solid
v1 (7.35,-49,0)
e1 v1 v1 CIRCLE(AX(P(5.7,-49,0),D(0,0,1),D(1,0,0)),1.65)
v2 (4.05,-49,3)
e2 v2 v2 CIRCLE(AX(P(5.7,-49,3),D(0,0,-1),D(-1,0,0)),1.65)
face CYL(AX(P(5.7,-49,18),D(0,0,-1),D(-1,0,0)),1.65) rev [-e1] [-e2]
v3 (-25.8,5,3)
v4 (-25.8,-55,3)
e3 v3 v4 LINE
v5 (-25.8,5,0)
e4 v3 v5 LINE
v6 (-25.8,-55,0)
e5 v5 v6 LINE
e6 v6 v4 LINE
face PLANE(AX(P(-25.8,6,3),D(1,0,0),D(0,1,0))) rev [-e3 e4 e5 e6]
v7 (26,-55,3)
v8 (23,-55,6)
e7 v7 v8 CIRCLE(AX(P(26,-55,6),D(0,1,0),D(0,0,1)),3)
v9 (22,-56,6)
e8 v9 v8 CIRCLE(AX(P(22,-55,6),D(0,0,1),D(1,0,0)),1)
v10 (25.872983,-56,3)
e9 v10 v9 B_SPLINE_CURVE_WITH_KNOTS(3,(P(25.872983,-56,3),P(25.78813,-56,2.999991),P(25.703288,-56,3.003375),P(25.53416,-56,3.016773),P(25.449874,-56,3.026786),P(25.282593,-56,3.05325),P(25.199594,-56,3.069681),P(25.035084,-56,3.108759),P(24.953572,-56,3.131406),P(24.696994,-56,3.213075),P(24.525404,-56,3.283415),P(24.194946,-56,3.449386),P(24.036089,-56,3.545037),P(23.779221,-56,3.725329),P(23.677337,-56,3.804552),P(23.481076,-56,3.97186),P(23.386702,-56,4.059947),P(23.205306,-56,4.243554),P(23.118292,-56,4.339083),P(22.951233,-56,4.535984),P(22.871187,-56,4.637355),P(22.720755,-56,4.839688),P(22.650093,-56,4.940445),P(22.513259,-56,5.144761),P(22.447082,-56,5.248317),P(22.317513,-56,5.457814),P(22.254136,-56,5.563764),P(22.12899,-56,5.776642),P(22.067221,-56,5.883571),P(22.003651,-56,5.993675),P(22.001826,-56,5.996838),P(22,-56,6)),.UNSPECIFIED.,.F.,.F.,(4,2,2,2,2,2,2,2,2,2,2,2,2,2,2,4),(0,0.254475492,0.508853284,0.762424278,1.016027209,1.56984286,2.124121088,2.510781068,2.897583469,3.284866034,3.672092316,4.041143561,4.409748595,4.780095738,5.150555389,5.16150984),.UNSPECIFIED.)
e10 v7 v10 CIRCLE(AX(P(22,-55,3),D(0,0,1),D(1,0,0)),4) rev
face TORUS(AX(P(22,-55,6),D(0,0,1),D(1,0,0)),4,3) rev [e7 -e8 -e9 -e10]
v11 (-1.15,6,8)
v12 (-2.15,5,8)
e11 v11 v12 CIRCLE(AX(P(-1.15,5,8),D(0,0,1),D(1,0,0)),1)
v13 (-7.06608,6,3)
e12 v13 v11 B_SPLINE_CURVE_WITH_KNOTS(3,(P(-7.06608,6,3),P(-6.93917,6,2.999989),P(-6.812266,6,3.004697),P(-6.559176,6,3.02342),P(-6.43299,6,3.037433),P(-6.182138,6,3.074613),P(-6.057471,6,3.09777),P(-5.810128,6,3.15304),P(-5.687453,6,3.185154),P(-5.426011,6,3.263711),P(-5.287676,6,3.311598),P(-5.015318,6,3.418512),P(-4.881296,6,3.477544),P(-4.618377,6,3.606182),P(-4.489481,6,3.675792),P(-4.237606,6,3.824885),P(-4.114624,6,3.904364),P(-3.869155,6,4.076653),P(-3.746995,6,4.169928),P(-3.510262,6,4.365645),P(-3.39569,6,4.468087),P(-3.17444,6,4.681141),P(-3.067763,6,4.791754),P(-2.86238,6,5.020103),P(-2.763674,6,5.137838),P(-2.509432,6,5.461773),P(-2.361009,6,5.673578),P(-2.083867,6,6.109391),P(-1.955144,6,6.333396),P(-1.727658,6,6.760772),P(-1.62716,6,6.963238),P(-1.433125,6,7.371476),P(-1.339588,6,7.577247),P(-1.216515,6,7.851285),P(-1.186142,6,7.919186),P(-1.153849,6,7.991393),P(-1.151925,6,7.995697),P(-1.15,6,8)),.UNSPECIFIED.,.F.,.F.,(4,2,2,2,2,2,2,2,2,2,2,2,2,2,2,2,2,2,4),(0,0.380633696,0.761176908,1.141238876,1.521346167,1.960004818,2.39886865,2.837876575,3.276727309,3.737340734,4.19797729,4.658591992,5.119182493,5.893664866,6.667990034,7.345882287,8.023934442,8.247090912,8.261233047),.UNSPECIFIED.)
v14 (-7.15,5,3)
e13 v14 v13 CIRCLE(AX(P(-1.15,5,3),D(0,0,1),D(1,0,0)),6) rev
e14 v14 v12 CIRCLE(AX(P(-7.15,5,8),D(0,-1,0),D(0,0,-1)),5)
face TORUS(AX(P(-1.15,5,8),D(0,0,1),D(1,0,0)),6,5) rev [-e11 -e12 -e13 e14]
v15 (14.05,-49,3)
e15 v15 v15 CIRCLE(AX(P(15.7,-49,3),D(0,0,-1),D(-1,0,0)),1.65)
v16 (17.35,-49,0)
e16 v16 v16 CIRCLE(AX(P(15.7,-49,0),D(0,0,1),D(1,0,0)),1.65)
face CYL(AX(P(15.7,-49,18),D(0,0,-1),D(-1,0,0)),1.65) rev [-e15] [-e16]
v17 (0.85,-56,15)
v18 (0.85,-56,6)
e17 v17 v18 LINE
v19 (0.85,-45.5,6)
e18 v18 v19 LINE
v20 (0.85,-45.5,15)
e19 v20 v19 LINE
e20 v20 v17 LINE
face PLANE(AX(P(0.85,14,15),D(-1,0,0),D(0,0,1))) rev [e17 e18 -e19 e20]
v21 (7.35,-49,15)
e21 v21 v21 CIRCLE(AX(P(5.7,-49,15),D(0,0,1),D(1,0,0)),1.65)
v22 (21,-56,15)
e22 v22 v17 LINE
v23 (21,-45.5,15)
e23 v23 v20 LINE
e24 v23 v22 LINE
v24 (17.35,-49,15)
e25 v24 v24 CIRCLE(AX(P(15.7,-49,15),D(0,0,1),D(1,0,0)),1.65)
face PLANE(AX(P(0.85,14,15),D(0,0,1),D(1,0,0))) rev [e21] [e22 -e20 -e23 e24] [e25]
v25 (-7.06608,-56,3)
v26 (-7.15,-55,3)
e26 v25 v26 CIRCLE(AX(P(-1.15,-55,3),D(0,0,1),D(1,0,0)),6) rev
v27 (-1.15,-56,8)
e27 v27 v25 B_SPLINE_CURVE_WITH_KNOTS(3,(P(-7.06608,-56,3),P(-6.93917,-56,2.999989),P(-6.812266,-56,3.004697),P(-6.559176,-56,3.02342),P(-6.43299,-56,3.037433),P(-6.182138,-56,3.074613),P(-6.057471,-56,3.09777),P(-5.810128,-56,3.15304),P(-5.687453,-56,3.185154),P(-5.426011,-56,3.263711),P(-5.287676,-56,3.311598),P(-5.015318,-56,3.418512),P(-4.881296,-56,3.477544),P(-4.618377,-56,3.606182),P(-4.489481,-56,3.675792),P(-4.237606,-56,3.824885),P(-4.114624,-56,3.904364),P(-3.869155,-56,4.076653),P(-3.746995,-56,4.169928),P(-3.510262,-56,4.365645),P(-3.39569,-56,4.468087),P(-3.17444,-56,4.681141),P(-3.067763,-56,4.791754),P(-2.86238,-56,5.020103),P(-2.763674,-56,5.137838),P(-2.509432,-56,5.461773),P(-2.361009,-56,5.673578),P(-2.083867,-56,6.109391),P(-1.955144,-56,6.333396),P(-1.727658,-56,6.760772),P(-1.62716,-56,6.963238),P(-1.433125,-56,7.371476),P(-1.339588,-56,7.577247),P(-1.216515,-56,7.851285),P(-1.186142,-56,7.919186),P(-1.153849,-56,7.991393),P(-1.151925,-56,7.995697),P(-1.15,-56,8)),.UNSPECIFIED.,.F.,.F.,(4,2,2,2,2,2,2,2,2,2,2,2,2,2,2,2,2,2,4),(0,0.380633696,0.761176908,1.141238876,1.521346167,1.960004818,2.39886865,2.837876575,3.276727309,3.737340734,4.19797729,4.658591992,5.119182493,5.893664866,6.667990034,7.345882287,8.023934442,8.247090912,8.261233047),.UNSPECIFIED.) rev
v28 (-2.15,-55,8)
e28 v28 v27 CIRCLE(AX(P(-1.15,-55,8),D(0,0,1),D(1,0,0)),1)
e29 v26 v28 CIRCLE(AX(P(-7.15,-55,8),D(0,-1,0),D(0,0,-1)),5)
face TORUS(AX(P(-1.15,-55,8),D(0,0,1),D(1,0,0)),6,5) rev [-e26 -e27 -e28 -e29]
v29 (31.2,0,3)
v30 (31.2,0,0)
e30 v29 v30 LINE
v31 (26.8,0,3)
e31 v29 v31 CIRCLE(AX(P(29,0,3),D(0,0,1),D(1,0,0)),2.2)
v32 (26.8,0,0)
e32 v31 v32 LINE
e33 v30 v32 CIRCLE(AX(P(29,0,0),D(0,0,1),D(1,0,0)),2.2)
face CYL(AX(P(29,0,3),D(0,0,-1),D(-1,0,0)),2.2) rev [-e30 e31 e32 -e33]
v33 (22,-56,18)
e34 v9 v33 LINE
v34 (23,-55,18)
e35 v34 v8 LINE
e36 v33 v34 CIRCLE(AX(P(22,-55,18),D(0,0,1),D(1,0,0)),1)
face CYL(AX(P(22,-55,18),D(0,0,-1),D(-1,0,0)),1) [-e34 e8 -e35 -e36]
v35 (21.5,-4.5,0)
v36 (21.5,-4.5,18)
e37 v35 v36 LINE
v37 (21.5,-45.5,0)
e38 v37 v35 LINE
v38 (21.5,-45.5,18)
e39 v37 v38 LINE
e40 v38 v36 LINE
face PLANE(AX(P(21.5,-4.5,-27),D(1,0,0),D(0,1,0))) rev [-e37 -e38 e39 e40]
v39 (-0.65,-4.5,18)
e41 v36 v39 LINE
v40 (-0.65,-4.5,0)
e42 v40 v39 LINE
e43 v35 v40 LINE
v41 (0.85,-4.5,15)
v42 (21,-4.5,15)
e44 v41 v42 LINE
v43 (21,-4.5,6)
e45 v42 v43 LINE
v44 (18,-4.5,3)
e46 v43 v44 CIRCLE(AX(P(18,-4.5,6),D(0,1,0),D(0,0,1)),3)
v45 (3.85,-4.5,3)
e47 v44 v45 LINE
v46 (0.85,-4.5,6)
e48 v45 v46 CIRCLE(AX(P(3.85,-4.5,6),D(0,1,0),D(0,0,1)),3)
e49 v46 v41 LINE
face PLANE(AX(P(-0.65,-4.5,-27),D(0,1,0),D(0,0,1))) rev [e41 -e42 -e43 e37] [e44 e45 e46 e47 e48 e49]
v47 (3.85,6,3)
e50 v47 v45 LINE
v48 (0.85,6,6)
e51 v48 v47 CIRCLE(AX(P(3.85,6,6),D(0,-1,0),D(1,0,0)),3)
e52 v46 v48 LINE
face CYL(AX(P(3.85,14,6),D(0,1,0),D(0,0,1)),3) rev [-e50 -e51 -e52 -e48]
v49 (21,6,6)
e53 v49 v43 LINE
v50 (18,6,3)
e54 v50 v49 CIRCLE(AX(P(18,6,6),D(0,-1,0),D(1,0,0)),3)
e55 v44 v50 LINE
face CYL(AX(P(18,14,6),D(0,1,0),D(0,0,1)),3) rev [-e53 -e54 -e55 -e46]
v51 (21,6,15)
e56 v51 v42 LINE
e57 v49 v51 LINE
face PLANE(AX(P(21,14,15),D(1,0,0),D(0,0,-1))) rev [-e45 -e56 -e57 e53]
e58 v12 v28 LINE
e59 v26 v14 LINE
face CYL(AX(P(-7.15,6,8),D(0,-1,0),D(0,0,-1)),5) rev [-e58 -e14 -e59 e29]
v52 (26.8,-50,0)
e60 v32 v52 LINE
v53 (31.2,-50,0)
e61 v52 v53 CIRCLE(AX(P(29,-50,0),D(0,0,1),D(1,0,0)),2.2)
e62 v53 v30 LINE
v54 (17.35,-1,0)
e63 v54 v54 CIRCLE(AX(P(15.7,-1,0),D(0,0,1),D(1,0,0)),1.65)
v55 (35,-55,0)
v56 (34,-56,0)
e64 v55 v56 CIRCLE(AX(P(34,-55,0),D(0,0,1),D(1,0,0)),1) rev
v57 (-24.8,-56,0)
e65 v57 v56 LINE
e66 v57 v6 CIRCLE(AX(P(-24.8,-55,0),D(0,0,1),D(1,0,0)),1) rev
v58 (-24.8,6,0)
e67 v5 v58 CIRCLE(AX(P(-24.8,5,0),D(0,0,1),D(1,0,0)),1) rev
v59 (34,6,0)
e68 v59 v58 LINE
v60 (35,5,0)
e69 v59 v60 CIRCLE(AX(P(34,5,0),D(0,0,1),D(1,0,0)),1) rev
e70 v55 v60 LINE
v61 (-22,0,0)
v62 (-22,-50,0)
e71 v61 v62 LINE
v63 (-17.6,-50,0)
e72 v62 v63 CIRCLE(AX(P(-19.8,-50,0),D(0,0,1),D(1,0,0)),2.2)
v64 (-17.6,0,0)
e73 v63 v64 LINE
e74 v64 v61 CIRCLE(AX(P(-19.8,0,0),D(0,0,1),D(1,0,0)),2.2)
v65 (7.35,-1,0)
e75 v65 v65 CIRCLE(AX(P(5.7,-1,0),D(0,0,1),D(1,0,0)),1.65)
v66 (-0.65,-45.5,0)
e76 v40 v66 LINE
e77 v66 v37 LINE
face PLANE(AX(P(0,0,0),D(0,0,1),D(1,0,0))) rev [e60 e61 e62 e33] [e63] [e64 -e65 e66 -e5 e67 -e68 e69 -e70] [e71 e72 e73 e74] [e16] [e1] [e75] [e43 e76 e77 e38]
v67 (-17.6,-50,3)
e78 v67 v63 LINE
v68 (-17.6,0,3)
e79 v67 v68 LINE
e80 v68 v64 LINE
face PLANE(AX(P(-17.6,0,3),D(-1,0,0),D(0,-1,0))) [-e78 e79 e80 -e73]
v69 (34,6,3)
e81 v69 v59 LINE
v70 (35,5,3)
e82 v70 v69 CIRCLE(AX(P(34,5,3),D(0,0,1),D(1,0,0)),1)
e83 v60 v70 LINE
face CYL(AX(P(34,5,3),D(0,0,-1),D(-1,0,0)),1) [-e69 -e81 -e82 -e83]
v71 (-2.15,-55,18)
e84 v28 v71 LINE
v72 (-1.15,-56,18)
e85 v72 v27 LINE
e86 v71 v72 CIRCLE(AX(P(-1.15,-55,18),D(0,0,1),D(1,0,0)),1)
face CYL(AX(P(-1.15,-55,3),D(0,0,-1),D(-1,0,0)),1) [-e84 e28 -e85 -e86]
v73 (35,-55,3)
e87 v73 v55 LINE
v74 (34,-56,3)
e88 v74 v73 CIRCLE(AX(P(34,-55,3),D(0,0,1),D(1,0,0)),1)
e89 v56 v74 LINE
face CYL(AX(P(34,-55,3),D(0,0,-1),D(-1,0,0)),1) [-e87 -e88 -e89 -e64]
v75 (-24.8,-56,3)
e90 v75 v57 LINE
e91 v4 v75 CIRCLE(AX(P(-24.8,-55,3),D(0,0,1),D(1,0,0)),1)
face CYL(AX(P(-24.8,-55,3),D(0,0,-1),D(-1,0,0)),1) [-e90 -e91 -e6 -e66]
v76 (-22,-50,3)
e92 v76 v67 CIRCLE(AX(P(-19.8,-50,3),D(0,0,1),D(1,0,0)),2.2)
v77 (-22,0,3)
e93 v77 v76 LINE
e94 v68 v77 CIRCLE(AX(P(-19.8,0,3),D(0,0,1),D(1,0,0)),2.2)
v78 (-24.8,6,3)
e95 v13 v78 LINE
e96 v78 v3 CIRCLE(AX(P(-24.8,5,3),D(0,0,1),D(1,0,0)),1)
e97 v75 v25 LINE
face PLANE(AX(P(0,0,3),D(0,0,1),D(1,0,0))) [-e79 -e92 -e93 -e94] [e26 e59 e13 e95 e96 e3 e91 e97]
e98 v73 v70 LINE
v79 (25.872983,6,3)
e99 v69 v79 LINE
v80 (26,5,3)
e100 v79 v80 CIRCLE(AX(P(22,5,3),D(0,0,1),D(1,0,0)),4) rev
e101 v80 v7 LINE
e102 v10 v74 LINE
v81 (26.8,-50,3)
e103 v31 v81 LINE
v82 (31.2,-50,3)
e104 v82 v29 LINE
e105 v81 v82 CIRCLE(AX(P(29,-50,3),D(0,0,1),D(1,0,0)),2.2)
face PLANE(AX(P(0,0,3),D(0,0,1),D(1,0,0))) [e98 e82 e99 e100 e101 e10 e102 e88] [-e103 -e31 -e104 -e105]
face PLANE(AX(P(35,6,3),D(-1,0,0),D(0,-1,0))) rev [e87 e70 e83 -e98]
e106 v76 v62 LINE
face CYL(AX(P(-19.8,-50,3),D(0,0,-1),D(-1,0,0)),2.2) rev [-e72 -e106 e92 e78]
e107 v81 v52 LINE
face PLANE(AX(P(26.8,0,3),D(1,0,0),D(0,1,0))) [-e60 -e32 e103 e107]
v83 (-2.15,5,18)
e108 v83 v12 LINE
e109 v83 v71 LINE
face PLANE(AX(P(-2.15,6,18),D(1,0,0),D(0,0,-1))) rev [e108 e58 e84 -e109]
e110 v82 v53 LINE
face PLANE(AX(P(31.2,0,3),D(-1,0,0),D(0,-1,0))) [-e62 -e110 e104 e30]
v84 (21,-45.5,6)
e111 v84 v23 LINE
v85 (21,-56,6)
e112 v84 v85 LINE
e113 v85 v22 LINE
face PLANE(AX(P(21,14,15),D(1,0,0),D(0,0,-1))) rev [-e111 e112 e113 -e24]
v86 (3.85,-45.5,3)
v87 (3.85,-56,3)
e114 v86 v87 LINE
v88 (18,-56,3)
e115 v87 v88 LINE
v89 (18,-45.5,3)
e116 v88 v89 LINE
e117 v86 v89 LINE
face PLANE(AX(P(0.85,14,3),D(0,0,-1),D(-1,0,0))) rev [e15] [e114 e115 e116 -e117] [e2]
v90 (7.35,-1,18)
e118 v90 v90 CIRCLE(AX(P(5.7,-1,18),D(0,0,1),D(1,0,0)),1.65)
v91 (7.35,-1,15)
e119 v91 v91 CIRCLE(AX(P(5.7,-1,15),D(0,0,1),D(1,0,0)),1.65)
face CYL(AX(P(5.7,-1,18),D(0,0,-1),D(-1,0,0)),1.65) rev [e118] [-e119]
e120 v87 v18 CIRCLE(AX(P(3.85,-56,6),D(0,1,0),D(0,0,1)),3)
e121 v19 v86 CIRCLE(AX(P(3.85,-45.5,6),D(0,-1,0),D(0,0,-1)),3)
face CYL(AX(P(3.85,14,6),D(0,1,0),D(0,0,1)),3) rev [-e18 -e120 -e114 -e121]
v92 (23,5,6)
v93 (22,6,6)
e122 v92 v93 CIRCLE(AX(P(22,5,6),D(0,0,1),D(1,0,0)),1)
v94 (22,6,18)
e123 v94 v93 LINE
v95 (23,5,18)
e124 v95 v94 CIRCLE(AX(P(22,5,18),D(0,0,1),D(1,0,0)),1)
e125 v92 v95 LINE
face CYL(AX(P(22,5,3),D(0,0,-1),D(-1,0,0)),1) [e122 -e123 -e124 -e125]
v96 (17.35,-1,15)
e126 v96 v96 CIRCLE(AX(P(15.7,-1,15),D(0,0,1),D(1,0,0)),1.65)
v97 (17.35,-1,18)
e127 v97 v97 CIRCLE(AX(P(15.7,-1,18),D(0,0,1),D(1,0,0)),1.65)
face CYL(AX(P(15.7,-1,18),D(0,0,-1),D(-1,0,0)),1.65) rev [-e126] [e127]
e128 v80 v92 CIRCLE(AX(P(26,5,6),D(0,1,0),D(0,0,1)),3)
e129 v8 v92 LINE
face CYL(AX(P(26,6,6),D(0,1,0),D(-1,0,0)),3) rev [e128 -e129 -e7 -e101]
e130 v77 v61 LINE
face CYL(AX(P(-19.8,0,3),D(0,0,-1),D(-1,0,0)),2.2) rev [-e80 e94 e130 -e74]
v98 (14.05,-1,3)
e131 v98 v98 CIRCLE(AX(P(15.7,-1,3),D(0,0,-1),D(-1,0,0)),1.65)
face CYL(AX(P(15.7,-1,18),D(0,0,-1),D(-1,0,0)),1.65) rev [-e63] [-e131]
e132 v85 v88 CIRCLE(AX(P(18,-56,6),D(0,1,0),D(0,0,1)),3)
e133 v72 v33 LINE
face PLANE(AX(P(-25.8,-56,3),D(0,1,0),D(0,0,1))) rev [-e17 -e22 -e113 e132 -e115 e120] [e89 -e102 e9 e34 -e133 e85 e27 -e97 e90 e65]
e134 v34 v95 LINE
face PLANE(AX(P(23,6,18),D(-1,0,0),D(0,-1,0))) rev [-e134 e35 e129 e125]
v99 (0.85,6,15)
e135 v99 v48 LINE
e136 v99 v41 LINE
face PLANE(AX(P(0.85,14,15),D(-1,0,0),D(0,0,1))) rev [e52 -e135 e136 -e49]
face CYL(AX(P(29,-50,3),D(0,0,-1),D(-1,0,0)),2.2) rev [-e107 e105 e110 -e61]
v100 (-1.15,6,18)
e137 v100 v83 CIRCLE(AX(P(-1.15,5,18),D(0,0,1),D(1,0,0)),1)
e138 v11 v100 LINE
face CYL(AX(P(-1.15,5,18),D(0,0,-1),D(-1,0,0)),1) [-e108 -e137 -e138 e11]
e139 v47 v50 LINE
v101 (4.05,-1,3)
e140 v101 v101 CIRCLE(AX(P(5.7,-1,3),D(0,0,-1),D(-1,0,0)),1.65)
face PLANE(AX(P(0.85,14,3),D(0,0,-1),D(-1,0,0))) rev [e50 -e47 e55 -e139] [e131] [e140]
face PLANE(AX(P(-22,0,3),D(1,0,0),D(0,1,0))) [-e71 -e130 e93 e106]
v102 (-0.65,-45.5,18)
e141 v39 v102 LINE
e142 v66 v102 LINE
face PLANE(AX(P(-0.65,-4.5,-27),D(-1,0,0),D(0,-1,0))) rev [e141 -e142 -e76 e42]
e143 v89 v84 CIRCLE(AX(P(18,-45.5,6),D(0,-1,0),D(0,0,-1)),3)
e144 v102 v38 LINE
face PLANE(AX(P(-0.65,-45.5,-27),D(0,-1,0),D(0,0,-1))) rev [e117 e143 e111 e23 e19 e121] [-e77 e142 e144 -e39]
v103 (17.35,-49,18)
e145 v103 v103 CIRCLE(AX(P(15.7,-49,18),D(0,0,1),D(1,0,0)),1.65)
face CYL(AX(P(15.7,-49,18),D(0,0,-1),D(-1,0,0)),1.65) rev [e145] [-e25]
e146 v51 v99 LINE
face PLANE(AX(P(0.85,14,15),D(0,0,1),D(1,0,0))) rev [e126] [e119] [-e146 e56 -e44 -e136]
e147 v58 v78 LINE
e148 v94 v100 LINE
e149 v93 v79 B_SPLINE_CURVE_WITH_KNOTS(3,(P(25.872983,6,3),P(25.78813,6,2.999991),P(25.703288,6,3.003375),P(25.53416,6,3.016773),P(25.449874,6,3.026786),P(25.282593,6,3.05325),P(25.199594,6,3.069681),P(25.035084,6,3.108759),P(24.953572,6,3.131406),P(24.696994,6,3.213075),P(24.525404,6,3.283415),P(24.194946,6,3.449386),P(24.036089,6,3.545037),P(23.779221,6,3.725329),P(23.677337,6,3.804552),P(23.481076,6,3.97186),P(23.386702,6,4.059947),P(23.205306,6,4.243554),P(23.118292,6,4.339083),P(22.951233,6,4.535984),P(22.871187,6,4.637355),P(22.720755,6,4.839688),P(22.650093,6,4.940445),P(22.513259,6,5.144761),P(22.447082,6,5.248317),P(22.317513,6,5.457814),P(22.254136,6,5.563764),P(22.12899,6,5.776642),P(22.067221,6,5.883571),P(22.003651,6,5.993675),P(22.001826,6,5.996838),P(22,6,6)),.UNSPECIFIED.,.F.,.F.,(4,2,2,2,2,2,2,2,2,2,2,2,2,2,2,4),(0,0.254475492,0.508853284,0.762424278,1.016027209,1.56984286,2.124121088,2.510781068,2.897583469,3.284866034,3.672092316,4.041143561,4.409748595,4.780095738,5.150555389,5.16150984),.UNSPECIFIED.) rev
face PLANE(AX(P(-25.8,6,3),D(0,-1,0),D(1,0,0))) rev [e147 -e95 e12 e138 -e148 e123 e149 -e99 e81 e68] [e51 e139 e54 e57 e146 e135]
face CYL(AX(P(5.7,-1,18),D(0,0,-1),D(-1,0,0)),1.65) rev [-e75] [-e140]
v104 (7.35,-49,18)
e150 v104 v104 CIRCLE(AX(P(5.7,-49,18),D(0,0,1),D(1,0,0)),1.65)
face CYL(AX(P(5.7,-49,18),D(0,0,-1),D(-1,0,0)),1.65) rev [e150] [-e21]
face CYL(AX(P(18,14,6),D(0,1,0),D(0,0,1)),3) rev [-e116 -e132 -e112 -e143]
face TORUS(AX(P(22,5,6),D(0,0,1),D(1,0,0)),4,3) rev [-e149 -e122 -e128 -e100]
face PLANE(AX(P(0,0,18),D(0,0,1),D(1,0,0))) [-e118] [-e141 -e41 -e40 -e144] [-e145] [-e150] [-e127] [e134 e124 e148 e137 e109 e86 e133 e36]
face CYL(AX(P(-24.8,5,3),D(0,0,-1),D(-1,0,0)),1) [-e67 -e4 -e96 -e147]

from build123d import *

# Parameters (mm, degrees)
SKETCH_1_W          = 60.8
SKETCH_1_H          = 62
EXTRUDE_1_DEPTH     = 3
SKETCH_2_W          = 25.15
SKETCH_2_H          = 62
SKETCH_2_R          = 1.65
EXTRUDE_2_DEPTH     = 15
CUT_EXTRUDE_START   = -45
SKETCH_4_R          = 1.65
SKETCH_4_W          = 22.15
SKETCH_4_H          = 41
CUT_EXTRUDE_4_DEPTH = 45
FILLET_1_R          = 1
FILLET_2_R          = 5
SKETCH_5_W          = 20.15
SKETCH_5_H          = 12
CUT_EXTRUDE_5_DEPTH = 70
FILLET_3_R          = 3
FILLET_4_R          = 3


with BuildPart() as part:
    # 草图1 → 凸台-拉伸1 (new body)
    with BuildSketch(Plane.XY):
        with Locations((4.6, -25)):
            Rectangle(SKETCH_1_W, SKETCH_1_H)
        with BuildLine():
            Line((26.8, 0), (26.8, -50))
            ThreePointArc((26.8, -50), (29, -52.2), (31.2, -50))
            Line((31.2, -50), (31.2, 0))
            ThreePointArc((31.2, 0), (29, 2.2), (26.8, 0))
        make_face(mode=Mode.SUBTRACT)
        with BuildLine():
            Line((-22, 0), (-22, -50))
            ThreePointArc((-22, -50), (-19.8, -52.2), (-17.6, -50))
            Line((-17.6, -50), (-17.6, 0))
            ThreePointArc((-17.6, 0), (-19.8, 2.2), (-22, 0))
        make_face(mode=Mode.SUBTRACT)
    extrude(amount=EXTRUDE_1_DEPTH)

    # 草图2 → 凸台-拉伸2 (add)
    with BuildSketch(Plane.XY.offset(3)):
        with Locations((10.425, -25)):
            Rectangle(SKETCH_2_W, SKETCH_2_H)
        with Locations((5.7, -1)):
            Circle(SKETCH_2_R, mode=Mode.SUBTRACT)
        with Locations((15.7, -1)):
            Circle(SKETCH_2_R, mode=Mode.SUBTRACT)
        with Locations((15.7, -49)):
            Circle(SKETCH_2_R, mode=Mode.SUBTRACT)
        with Locations((5.7, -49)):
            Circle(SKETCH_2_R, mode=Mode.SUBTRACT)
    extrude(amount=EXTRUDE_2_DEPTH)

    # 草图4 → 切除-拉伸4 (cut)
    with BuildSketch(Plane.XY.offset(18).offset(CUT_EXTRUDE_START)):
        with Locations((5.7, -1)):
            Circle(SKETCH_4_R)
        with Locations((5.7, -49)):
            Circle(SKETCH_4_R)
        with Locations((15.7, -49)):
            Circle(SKETCH_4_R)
        with Locations((15.7, -1)):
            Circle(SKETCH_4_R)
        with Locations((10.425, -25)):
            Rectangle(SKETCH_4_W, SKETCH_4_H)
    extrude(amount=CUT_EXTRUDE_4_DEPTH, mode=Mode.SUBTRACT)

    # 圆角1
    fillet_1_edges = [part.edges().sort_by_distance(p)[0] for p in [
        (-2.15, 6, 10.5),
        (-2.15, -56, 10.5),
        (23, -56, 10.5),
        (23, 6, 10.5),
        (-25.8, 6, 1.5),
        (35, 6, 1.5),
        (35, -56, 1.5),
        (-25.8, -56, 1.5),
    ]]
    fillet(fillet_1_edges, radius=FILLET_1_R)

    # 圆角2
    # the kernel refuses this fillet: 5 mm, written as the material it adds along each edge
    with BuildSketch(Plane(origin=(-2.15, -55, 3), x_dir=(0, 0, 1), z_dir=(0, 1, 0))) as fillet_2_piece_1:
        with BuildLine():
            CenterArc((FILLET_2_R, -FILLET_2_R), FILLET_2_R, 90, 90)
            Line((0, -FILLET_2_R), (0, 0))
            Line((0, 0), (FILLET_2_R, 0))
        make_face()
    extrude(amount=60)
    with BuildSketch(Plane(origin=(-1.15, 5, 3), x_dir=(-0.9999802608561372, -0.00628314396555929, 0), z_dir=(-0.00628314396555929, 0.9999802608561372, 0))) as fillet_2_piece_2_section:
        with BuildLine():
            CenterArc((-1 - FILLET_2_R, FILLET_2_R), FILLET_2_R, 270, 90)
            Line((-1 - FILLET_2_R, 0), (-1, 0))
            Line((-1, 0), (-1, FILLET_2_R))
        make_face()
    fillet_2_piece_2 = revolve(axis=Axis((-1.15, 5, 3), (0, 0, 1)), revolution_arc=359.64, mode=Mode.PRIVATE)
    fillet_2_piece_2 = split(fillet_2_piece_2, bisect_by=Plane(origin=(-1.917475006, 6, 5.017645517), z_dir=(0, -1, 0)), keep=Keep.TOP, mode=Mode.PRIVATE)
    add(fillet_2_piece_2)
    with BuildSketch(Plane(origin=(-1.15, -55, 3), x_dir=(-0.9999802608561372, 0.006283143965561067, 0), z_dir=(-0.006283143965561067, -0.9999802608561372, 0))) as fillet_2_piece_3_section:
        with BuildLine():
            CenterArc((-1 - FILLET_2_R, -FILLET_2_R), FILLET_2_R, 0, 90)
            Line((-1 - FILLET_2_R, 0), (-1, 0))
            Line((-1, 0), (-1, -FILLET_2_R))
        make_face()
    fillet_2_piece_3 = revolve(axis=Axis((-1.15, -55, 3), (0, 0, -1)), revolution_arc=359.64, mode=Mode.PRIVATE)
    fillet_2_piece_3 = split(fillet_2_piece_3, bisect_by=Plane(origin=(-1.917475041, -56, 5.017645533), z_dir=(0, 1, 0)), keep=Keep.TOP, mode=Mode.PRIVATE)
    add(fillet_2_piece_3)

    # 草图5 → 切除-拉伸5 (cut)
    with BuildSketch(Plane(origin=(0, -56, 0), x_dir=(-1, 0, 0), z_dir=(0, -1, 0))):
        with Locations((-10.925, -9)):
            Rectangle(SKETCH_5_W, SKETCH_5_H)
    extrude(amount=-CUT_EXTRUDE_5_DEPTH, mode=Mode.SUBTRACT)

    # 圆角3
    fillet_3_edges = [part.edges().sort_by_distance(p)[0] for p in [
        (0.85, 0.75, 3),
        (0.85, -50.75, 3),
        (21, 0.75, 3),
        (21, -50.75, 3),
    ]]
    fillet(fillet_3_edges, radius=FILLET_3_R)

    # 圆角4
    # the kernel refuses this fillet: 3 mm, written as the material it adds along each edge
    with BuildSketch(Plane(origin=(23, 5, 3), x_dir=(1, 0, 0), z_dir=(0, -1, 0))) as fillet_4_piece_1:
        with BuildLine():
            CenterArc((FILLET_4_R, FILLET_4_R), FILLET_4_R, 180, 90)
            Line((0, FILLET_4_R), (0, 0))
            Line((0, 0), (FILLET_4_R, 0))
        make_face()
    extrude(amount=60)
    with BuildSketch(Plane(origin=(22, 5, 3), x_dir=(0.9999802608561372, -0.0062831439655584, 0), z_dir=(0.0062831439655584, 0.9999802608561372, 0))) as fillet_4_piece_2_section:
        with BuildLine():
            CenterArc((-1 - FILLET_4_R, -FILLET_4_R), FILLET_4_R, 0, 90)
            Line((-1, -FILLET_4_R), (-1, 0))
            Line((-1, 0), (-1 - FILLET_4_R, 0))
        make_face()
    fillet_4_piece_2 = revolve(axis=Axis((22, 5, 3), (0, 0, -1)), revolution_arc=359.64, mode=Mode.PRIVATE)
    fillet_4_piece_2 = split(fillet_4_piece_2, bisect_by=Plane(origin=(22.764056833, 6, 4.135633633), z_dir=(0, -1, 0)), keep=Keep.TOP, mode=Mode.PRIVATE)
    add(fillet_4_piece_2)
    with BuildSketch(Plane(origin=(22, -55, 3), x_dir=(0.9999802608561372, 0.006283143965561065, 0), z_dir=(0.006283143965561065, -0.9999802608561372, 0))) as fillet_4_piece_3_section:
        with BuildLine():
            CenterArc((-1 - FILLET_4_R, FILLET_4_R), FILLET_4_R, 270, 90)
            Line((-1 - FILLET_4_R, 0), (-1, 0))
            Line((-1, 0), (-1, FILLET_4_R))
        make_face()
    fillet_4_piece_3 = revolve(axis=Axis((22, -55, 3), (0, 0, 1)), revolution_arc=359.64, mode=Mode.PRIVATE)
    fillet_4_piece_3 = split(fillet_4_piece_3, bisect_by=Plane(origin=(22.76405677, -56, 4.135633616), z_dir=(0, 1, 0)), keep=Keep.TOP, mode=Mode.PRIVATE)
    add(fillet_4_piece_3)


solid = part.part
